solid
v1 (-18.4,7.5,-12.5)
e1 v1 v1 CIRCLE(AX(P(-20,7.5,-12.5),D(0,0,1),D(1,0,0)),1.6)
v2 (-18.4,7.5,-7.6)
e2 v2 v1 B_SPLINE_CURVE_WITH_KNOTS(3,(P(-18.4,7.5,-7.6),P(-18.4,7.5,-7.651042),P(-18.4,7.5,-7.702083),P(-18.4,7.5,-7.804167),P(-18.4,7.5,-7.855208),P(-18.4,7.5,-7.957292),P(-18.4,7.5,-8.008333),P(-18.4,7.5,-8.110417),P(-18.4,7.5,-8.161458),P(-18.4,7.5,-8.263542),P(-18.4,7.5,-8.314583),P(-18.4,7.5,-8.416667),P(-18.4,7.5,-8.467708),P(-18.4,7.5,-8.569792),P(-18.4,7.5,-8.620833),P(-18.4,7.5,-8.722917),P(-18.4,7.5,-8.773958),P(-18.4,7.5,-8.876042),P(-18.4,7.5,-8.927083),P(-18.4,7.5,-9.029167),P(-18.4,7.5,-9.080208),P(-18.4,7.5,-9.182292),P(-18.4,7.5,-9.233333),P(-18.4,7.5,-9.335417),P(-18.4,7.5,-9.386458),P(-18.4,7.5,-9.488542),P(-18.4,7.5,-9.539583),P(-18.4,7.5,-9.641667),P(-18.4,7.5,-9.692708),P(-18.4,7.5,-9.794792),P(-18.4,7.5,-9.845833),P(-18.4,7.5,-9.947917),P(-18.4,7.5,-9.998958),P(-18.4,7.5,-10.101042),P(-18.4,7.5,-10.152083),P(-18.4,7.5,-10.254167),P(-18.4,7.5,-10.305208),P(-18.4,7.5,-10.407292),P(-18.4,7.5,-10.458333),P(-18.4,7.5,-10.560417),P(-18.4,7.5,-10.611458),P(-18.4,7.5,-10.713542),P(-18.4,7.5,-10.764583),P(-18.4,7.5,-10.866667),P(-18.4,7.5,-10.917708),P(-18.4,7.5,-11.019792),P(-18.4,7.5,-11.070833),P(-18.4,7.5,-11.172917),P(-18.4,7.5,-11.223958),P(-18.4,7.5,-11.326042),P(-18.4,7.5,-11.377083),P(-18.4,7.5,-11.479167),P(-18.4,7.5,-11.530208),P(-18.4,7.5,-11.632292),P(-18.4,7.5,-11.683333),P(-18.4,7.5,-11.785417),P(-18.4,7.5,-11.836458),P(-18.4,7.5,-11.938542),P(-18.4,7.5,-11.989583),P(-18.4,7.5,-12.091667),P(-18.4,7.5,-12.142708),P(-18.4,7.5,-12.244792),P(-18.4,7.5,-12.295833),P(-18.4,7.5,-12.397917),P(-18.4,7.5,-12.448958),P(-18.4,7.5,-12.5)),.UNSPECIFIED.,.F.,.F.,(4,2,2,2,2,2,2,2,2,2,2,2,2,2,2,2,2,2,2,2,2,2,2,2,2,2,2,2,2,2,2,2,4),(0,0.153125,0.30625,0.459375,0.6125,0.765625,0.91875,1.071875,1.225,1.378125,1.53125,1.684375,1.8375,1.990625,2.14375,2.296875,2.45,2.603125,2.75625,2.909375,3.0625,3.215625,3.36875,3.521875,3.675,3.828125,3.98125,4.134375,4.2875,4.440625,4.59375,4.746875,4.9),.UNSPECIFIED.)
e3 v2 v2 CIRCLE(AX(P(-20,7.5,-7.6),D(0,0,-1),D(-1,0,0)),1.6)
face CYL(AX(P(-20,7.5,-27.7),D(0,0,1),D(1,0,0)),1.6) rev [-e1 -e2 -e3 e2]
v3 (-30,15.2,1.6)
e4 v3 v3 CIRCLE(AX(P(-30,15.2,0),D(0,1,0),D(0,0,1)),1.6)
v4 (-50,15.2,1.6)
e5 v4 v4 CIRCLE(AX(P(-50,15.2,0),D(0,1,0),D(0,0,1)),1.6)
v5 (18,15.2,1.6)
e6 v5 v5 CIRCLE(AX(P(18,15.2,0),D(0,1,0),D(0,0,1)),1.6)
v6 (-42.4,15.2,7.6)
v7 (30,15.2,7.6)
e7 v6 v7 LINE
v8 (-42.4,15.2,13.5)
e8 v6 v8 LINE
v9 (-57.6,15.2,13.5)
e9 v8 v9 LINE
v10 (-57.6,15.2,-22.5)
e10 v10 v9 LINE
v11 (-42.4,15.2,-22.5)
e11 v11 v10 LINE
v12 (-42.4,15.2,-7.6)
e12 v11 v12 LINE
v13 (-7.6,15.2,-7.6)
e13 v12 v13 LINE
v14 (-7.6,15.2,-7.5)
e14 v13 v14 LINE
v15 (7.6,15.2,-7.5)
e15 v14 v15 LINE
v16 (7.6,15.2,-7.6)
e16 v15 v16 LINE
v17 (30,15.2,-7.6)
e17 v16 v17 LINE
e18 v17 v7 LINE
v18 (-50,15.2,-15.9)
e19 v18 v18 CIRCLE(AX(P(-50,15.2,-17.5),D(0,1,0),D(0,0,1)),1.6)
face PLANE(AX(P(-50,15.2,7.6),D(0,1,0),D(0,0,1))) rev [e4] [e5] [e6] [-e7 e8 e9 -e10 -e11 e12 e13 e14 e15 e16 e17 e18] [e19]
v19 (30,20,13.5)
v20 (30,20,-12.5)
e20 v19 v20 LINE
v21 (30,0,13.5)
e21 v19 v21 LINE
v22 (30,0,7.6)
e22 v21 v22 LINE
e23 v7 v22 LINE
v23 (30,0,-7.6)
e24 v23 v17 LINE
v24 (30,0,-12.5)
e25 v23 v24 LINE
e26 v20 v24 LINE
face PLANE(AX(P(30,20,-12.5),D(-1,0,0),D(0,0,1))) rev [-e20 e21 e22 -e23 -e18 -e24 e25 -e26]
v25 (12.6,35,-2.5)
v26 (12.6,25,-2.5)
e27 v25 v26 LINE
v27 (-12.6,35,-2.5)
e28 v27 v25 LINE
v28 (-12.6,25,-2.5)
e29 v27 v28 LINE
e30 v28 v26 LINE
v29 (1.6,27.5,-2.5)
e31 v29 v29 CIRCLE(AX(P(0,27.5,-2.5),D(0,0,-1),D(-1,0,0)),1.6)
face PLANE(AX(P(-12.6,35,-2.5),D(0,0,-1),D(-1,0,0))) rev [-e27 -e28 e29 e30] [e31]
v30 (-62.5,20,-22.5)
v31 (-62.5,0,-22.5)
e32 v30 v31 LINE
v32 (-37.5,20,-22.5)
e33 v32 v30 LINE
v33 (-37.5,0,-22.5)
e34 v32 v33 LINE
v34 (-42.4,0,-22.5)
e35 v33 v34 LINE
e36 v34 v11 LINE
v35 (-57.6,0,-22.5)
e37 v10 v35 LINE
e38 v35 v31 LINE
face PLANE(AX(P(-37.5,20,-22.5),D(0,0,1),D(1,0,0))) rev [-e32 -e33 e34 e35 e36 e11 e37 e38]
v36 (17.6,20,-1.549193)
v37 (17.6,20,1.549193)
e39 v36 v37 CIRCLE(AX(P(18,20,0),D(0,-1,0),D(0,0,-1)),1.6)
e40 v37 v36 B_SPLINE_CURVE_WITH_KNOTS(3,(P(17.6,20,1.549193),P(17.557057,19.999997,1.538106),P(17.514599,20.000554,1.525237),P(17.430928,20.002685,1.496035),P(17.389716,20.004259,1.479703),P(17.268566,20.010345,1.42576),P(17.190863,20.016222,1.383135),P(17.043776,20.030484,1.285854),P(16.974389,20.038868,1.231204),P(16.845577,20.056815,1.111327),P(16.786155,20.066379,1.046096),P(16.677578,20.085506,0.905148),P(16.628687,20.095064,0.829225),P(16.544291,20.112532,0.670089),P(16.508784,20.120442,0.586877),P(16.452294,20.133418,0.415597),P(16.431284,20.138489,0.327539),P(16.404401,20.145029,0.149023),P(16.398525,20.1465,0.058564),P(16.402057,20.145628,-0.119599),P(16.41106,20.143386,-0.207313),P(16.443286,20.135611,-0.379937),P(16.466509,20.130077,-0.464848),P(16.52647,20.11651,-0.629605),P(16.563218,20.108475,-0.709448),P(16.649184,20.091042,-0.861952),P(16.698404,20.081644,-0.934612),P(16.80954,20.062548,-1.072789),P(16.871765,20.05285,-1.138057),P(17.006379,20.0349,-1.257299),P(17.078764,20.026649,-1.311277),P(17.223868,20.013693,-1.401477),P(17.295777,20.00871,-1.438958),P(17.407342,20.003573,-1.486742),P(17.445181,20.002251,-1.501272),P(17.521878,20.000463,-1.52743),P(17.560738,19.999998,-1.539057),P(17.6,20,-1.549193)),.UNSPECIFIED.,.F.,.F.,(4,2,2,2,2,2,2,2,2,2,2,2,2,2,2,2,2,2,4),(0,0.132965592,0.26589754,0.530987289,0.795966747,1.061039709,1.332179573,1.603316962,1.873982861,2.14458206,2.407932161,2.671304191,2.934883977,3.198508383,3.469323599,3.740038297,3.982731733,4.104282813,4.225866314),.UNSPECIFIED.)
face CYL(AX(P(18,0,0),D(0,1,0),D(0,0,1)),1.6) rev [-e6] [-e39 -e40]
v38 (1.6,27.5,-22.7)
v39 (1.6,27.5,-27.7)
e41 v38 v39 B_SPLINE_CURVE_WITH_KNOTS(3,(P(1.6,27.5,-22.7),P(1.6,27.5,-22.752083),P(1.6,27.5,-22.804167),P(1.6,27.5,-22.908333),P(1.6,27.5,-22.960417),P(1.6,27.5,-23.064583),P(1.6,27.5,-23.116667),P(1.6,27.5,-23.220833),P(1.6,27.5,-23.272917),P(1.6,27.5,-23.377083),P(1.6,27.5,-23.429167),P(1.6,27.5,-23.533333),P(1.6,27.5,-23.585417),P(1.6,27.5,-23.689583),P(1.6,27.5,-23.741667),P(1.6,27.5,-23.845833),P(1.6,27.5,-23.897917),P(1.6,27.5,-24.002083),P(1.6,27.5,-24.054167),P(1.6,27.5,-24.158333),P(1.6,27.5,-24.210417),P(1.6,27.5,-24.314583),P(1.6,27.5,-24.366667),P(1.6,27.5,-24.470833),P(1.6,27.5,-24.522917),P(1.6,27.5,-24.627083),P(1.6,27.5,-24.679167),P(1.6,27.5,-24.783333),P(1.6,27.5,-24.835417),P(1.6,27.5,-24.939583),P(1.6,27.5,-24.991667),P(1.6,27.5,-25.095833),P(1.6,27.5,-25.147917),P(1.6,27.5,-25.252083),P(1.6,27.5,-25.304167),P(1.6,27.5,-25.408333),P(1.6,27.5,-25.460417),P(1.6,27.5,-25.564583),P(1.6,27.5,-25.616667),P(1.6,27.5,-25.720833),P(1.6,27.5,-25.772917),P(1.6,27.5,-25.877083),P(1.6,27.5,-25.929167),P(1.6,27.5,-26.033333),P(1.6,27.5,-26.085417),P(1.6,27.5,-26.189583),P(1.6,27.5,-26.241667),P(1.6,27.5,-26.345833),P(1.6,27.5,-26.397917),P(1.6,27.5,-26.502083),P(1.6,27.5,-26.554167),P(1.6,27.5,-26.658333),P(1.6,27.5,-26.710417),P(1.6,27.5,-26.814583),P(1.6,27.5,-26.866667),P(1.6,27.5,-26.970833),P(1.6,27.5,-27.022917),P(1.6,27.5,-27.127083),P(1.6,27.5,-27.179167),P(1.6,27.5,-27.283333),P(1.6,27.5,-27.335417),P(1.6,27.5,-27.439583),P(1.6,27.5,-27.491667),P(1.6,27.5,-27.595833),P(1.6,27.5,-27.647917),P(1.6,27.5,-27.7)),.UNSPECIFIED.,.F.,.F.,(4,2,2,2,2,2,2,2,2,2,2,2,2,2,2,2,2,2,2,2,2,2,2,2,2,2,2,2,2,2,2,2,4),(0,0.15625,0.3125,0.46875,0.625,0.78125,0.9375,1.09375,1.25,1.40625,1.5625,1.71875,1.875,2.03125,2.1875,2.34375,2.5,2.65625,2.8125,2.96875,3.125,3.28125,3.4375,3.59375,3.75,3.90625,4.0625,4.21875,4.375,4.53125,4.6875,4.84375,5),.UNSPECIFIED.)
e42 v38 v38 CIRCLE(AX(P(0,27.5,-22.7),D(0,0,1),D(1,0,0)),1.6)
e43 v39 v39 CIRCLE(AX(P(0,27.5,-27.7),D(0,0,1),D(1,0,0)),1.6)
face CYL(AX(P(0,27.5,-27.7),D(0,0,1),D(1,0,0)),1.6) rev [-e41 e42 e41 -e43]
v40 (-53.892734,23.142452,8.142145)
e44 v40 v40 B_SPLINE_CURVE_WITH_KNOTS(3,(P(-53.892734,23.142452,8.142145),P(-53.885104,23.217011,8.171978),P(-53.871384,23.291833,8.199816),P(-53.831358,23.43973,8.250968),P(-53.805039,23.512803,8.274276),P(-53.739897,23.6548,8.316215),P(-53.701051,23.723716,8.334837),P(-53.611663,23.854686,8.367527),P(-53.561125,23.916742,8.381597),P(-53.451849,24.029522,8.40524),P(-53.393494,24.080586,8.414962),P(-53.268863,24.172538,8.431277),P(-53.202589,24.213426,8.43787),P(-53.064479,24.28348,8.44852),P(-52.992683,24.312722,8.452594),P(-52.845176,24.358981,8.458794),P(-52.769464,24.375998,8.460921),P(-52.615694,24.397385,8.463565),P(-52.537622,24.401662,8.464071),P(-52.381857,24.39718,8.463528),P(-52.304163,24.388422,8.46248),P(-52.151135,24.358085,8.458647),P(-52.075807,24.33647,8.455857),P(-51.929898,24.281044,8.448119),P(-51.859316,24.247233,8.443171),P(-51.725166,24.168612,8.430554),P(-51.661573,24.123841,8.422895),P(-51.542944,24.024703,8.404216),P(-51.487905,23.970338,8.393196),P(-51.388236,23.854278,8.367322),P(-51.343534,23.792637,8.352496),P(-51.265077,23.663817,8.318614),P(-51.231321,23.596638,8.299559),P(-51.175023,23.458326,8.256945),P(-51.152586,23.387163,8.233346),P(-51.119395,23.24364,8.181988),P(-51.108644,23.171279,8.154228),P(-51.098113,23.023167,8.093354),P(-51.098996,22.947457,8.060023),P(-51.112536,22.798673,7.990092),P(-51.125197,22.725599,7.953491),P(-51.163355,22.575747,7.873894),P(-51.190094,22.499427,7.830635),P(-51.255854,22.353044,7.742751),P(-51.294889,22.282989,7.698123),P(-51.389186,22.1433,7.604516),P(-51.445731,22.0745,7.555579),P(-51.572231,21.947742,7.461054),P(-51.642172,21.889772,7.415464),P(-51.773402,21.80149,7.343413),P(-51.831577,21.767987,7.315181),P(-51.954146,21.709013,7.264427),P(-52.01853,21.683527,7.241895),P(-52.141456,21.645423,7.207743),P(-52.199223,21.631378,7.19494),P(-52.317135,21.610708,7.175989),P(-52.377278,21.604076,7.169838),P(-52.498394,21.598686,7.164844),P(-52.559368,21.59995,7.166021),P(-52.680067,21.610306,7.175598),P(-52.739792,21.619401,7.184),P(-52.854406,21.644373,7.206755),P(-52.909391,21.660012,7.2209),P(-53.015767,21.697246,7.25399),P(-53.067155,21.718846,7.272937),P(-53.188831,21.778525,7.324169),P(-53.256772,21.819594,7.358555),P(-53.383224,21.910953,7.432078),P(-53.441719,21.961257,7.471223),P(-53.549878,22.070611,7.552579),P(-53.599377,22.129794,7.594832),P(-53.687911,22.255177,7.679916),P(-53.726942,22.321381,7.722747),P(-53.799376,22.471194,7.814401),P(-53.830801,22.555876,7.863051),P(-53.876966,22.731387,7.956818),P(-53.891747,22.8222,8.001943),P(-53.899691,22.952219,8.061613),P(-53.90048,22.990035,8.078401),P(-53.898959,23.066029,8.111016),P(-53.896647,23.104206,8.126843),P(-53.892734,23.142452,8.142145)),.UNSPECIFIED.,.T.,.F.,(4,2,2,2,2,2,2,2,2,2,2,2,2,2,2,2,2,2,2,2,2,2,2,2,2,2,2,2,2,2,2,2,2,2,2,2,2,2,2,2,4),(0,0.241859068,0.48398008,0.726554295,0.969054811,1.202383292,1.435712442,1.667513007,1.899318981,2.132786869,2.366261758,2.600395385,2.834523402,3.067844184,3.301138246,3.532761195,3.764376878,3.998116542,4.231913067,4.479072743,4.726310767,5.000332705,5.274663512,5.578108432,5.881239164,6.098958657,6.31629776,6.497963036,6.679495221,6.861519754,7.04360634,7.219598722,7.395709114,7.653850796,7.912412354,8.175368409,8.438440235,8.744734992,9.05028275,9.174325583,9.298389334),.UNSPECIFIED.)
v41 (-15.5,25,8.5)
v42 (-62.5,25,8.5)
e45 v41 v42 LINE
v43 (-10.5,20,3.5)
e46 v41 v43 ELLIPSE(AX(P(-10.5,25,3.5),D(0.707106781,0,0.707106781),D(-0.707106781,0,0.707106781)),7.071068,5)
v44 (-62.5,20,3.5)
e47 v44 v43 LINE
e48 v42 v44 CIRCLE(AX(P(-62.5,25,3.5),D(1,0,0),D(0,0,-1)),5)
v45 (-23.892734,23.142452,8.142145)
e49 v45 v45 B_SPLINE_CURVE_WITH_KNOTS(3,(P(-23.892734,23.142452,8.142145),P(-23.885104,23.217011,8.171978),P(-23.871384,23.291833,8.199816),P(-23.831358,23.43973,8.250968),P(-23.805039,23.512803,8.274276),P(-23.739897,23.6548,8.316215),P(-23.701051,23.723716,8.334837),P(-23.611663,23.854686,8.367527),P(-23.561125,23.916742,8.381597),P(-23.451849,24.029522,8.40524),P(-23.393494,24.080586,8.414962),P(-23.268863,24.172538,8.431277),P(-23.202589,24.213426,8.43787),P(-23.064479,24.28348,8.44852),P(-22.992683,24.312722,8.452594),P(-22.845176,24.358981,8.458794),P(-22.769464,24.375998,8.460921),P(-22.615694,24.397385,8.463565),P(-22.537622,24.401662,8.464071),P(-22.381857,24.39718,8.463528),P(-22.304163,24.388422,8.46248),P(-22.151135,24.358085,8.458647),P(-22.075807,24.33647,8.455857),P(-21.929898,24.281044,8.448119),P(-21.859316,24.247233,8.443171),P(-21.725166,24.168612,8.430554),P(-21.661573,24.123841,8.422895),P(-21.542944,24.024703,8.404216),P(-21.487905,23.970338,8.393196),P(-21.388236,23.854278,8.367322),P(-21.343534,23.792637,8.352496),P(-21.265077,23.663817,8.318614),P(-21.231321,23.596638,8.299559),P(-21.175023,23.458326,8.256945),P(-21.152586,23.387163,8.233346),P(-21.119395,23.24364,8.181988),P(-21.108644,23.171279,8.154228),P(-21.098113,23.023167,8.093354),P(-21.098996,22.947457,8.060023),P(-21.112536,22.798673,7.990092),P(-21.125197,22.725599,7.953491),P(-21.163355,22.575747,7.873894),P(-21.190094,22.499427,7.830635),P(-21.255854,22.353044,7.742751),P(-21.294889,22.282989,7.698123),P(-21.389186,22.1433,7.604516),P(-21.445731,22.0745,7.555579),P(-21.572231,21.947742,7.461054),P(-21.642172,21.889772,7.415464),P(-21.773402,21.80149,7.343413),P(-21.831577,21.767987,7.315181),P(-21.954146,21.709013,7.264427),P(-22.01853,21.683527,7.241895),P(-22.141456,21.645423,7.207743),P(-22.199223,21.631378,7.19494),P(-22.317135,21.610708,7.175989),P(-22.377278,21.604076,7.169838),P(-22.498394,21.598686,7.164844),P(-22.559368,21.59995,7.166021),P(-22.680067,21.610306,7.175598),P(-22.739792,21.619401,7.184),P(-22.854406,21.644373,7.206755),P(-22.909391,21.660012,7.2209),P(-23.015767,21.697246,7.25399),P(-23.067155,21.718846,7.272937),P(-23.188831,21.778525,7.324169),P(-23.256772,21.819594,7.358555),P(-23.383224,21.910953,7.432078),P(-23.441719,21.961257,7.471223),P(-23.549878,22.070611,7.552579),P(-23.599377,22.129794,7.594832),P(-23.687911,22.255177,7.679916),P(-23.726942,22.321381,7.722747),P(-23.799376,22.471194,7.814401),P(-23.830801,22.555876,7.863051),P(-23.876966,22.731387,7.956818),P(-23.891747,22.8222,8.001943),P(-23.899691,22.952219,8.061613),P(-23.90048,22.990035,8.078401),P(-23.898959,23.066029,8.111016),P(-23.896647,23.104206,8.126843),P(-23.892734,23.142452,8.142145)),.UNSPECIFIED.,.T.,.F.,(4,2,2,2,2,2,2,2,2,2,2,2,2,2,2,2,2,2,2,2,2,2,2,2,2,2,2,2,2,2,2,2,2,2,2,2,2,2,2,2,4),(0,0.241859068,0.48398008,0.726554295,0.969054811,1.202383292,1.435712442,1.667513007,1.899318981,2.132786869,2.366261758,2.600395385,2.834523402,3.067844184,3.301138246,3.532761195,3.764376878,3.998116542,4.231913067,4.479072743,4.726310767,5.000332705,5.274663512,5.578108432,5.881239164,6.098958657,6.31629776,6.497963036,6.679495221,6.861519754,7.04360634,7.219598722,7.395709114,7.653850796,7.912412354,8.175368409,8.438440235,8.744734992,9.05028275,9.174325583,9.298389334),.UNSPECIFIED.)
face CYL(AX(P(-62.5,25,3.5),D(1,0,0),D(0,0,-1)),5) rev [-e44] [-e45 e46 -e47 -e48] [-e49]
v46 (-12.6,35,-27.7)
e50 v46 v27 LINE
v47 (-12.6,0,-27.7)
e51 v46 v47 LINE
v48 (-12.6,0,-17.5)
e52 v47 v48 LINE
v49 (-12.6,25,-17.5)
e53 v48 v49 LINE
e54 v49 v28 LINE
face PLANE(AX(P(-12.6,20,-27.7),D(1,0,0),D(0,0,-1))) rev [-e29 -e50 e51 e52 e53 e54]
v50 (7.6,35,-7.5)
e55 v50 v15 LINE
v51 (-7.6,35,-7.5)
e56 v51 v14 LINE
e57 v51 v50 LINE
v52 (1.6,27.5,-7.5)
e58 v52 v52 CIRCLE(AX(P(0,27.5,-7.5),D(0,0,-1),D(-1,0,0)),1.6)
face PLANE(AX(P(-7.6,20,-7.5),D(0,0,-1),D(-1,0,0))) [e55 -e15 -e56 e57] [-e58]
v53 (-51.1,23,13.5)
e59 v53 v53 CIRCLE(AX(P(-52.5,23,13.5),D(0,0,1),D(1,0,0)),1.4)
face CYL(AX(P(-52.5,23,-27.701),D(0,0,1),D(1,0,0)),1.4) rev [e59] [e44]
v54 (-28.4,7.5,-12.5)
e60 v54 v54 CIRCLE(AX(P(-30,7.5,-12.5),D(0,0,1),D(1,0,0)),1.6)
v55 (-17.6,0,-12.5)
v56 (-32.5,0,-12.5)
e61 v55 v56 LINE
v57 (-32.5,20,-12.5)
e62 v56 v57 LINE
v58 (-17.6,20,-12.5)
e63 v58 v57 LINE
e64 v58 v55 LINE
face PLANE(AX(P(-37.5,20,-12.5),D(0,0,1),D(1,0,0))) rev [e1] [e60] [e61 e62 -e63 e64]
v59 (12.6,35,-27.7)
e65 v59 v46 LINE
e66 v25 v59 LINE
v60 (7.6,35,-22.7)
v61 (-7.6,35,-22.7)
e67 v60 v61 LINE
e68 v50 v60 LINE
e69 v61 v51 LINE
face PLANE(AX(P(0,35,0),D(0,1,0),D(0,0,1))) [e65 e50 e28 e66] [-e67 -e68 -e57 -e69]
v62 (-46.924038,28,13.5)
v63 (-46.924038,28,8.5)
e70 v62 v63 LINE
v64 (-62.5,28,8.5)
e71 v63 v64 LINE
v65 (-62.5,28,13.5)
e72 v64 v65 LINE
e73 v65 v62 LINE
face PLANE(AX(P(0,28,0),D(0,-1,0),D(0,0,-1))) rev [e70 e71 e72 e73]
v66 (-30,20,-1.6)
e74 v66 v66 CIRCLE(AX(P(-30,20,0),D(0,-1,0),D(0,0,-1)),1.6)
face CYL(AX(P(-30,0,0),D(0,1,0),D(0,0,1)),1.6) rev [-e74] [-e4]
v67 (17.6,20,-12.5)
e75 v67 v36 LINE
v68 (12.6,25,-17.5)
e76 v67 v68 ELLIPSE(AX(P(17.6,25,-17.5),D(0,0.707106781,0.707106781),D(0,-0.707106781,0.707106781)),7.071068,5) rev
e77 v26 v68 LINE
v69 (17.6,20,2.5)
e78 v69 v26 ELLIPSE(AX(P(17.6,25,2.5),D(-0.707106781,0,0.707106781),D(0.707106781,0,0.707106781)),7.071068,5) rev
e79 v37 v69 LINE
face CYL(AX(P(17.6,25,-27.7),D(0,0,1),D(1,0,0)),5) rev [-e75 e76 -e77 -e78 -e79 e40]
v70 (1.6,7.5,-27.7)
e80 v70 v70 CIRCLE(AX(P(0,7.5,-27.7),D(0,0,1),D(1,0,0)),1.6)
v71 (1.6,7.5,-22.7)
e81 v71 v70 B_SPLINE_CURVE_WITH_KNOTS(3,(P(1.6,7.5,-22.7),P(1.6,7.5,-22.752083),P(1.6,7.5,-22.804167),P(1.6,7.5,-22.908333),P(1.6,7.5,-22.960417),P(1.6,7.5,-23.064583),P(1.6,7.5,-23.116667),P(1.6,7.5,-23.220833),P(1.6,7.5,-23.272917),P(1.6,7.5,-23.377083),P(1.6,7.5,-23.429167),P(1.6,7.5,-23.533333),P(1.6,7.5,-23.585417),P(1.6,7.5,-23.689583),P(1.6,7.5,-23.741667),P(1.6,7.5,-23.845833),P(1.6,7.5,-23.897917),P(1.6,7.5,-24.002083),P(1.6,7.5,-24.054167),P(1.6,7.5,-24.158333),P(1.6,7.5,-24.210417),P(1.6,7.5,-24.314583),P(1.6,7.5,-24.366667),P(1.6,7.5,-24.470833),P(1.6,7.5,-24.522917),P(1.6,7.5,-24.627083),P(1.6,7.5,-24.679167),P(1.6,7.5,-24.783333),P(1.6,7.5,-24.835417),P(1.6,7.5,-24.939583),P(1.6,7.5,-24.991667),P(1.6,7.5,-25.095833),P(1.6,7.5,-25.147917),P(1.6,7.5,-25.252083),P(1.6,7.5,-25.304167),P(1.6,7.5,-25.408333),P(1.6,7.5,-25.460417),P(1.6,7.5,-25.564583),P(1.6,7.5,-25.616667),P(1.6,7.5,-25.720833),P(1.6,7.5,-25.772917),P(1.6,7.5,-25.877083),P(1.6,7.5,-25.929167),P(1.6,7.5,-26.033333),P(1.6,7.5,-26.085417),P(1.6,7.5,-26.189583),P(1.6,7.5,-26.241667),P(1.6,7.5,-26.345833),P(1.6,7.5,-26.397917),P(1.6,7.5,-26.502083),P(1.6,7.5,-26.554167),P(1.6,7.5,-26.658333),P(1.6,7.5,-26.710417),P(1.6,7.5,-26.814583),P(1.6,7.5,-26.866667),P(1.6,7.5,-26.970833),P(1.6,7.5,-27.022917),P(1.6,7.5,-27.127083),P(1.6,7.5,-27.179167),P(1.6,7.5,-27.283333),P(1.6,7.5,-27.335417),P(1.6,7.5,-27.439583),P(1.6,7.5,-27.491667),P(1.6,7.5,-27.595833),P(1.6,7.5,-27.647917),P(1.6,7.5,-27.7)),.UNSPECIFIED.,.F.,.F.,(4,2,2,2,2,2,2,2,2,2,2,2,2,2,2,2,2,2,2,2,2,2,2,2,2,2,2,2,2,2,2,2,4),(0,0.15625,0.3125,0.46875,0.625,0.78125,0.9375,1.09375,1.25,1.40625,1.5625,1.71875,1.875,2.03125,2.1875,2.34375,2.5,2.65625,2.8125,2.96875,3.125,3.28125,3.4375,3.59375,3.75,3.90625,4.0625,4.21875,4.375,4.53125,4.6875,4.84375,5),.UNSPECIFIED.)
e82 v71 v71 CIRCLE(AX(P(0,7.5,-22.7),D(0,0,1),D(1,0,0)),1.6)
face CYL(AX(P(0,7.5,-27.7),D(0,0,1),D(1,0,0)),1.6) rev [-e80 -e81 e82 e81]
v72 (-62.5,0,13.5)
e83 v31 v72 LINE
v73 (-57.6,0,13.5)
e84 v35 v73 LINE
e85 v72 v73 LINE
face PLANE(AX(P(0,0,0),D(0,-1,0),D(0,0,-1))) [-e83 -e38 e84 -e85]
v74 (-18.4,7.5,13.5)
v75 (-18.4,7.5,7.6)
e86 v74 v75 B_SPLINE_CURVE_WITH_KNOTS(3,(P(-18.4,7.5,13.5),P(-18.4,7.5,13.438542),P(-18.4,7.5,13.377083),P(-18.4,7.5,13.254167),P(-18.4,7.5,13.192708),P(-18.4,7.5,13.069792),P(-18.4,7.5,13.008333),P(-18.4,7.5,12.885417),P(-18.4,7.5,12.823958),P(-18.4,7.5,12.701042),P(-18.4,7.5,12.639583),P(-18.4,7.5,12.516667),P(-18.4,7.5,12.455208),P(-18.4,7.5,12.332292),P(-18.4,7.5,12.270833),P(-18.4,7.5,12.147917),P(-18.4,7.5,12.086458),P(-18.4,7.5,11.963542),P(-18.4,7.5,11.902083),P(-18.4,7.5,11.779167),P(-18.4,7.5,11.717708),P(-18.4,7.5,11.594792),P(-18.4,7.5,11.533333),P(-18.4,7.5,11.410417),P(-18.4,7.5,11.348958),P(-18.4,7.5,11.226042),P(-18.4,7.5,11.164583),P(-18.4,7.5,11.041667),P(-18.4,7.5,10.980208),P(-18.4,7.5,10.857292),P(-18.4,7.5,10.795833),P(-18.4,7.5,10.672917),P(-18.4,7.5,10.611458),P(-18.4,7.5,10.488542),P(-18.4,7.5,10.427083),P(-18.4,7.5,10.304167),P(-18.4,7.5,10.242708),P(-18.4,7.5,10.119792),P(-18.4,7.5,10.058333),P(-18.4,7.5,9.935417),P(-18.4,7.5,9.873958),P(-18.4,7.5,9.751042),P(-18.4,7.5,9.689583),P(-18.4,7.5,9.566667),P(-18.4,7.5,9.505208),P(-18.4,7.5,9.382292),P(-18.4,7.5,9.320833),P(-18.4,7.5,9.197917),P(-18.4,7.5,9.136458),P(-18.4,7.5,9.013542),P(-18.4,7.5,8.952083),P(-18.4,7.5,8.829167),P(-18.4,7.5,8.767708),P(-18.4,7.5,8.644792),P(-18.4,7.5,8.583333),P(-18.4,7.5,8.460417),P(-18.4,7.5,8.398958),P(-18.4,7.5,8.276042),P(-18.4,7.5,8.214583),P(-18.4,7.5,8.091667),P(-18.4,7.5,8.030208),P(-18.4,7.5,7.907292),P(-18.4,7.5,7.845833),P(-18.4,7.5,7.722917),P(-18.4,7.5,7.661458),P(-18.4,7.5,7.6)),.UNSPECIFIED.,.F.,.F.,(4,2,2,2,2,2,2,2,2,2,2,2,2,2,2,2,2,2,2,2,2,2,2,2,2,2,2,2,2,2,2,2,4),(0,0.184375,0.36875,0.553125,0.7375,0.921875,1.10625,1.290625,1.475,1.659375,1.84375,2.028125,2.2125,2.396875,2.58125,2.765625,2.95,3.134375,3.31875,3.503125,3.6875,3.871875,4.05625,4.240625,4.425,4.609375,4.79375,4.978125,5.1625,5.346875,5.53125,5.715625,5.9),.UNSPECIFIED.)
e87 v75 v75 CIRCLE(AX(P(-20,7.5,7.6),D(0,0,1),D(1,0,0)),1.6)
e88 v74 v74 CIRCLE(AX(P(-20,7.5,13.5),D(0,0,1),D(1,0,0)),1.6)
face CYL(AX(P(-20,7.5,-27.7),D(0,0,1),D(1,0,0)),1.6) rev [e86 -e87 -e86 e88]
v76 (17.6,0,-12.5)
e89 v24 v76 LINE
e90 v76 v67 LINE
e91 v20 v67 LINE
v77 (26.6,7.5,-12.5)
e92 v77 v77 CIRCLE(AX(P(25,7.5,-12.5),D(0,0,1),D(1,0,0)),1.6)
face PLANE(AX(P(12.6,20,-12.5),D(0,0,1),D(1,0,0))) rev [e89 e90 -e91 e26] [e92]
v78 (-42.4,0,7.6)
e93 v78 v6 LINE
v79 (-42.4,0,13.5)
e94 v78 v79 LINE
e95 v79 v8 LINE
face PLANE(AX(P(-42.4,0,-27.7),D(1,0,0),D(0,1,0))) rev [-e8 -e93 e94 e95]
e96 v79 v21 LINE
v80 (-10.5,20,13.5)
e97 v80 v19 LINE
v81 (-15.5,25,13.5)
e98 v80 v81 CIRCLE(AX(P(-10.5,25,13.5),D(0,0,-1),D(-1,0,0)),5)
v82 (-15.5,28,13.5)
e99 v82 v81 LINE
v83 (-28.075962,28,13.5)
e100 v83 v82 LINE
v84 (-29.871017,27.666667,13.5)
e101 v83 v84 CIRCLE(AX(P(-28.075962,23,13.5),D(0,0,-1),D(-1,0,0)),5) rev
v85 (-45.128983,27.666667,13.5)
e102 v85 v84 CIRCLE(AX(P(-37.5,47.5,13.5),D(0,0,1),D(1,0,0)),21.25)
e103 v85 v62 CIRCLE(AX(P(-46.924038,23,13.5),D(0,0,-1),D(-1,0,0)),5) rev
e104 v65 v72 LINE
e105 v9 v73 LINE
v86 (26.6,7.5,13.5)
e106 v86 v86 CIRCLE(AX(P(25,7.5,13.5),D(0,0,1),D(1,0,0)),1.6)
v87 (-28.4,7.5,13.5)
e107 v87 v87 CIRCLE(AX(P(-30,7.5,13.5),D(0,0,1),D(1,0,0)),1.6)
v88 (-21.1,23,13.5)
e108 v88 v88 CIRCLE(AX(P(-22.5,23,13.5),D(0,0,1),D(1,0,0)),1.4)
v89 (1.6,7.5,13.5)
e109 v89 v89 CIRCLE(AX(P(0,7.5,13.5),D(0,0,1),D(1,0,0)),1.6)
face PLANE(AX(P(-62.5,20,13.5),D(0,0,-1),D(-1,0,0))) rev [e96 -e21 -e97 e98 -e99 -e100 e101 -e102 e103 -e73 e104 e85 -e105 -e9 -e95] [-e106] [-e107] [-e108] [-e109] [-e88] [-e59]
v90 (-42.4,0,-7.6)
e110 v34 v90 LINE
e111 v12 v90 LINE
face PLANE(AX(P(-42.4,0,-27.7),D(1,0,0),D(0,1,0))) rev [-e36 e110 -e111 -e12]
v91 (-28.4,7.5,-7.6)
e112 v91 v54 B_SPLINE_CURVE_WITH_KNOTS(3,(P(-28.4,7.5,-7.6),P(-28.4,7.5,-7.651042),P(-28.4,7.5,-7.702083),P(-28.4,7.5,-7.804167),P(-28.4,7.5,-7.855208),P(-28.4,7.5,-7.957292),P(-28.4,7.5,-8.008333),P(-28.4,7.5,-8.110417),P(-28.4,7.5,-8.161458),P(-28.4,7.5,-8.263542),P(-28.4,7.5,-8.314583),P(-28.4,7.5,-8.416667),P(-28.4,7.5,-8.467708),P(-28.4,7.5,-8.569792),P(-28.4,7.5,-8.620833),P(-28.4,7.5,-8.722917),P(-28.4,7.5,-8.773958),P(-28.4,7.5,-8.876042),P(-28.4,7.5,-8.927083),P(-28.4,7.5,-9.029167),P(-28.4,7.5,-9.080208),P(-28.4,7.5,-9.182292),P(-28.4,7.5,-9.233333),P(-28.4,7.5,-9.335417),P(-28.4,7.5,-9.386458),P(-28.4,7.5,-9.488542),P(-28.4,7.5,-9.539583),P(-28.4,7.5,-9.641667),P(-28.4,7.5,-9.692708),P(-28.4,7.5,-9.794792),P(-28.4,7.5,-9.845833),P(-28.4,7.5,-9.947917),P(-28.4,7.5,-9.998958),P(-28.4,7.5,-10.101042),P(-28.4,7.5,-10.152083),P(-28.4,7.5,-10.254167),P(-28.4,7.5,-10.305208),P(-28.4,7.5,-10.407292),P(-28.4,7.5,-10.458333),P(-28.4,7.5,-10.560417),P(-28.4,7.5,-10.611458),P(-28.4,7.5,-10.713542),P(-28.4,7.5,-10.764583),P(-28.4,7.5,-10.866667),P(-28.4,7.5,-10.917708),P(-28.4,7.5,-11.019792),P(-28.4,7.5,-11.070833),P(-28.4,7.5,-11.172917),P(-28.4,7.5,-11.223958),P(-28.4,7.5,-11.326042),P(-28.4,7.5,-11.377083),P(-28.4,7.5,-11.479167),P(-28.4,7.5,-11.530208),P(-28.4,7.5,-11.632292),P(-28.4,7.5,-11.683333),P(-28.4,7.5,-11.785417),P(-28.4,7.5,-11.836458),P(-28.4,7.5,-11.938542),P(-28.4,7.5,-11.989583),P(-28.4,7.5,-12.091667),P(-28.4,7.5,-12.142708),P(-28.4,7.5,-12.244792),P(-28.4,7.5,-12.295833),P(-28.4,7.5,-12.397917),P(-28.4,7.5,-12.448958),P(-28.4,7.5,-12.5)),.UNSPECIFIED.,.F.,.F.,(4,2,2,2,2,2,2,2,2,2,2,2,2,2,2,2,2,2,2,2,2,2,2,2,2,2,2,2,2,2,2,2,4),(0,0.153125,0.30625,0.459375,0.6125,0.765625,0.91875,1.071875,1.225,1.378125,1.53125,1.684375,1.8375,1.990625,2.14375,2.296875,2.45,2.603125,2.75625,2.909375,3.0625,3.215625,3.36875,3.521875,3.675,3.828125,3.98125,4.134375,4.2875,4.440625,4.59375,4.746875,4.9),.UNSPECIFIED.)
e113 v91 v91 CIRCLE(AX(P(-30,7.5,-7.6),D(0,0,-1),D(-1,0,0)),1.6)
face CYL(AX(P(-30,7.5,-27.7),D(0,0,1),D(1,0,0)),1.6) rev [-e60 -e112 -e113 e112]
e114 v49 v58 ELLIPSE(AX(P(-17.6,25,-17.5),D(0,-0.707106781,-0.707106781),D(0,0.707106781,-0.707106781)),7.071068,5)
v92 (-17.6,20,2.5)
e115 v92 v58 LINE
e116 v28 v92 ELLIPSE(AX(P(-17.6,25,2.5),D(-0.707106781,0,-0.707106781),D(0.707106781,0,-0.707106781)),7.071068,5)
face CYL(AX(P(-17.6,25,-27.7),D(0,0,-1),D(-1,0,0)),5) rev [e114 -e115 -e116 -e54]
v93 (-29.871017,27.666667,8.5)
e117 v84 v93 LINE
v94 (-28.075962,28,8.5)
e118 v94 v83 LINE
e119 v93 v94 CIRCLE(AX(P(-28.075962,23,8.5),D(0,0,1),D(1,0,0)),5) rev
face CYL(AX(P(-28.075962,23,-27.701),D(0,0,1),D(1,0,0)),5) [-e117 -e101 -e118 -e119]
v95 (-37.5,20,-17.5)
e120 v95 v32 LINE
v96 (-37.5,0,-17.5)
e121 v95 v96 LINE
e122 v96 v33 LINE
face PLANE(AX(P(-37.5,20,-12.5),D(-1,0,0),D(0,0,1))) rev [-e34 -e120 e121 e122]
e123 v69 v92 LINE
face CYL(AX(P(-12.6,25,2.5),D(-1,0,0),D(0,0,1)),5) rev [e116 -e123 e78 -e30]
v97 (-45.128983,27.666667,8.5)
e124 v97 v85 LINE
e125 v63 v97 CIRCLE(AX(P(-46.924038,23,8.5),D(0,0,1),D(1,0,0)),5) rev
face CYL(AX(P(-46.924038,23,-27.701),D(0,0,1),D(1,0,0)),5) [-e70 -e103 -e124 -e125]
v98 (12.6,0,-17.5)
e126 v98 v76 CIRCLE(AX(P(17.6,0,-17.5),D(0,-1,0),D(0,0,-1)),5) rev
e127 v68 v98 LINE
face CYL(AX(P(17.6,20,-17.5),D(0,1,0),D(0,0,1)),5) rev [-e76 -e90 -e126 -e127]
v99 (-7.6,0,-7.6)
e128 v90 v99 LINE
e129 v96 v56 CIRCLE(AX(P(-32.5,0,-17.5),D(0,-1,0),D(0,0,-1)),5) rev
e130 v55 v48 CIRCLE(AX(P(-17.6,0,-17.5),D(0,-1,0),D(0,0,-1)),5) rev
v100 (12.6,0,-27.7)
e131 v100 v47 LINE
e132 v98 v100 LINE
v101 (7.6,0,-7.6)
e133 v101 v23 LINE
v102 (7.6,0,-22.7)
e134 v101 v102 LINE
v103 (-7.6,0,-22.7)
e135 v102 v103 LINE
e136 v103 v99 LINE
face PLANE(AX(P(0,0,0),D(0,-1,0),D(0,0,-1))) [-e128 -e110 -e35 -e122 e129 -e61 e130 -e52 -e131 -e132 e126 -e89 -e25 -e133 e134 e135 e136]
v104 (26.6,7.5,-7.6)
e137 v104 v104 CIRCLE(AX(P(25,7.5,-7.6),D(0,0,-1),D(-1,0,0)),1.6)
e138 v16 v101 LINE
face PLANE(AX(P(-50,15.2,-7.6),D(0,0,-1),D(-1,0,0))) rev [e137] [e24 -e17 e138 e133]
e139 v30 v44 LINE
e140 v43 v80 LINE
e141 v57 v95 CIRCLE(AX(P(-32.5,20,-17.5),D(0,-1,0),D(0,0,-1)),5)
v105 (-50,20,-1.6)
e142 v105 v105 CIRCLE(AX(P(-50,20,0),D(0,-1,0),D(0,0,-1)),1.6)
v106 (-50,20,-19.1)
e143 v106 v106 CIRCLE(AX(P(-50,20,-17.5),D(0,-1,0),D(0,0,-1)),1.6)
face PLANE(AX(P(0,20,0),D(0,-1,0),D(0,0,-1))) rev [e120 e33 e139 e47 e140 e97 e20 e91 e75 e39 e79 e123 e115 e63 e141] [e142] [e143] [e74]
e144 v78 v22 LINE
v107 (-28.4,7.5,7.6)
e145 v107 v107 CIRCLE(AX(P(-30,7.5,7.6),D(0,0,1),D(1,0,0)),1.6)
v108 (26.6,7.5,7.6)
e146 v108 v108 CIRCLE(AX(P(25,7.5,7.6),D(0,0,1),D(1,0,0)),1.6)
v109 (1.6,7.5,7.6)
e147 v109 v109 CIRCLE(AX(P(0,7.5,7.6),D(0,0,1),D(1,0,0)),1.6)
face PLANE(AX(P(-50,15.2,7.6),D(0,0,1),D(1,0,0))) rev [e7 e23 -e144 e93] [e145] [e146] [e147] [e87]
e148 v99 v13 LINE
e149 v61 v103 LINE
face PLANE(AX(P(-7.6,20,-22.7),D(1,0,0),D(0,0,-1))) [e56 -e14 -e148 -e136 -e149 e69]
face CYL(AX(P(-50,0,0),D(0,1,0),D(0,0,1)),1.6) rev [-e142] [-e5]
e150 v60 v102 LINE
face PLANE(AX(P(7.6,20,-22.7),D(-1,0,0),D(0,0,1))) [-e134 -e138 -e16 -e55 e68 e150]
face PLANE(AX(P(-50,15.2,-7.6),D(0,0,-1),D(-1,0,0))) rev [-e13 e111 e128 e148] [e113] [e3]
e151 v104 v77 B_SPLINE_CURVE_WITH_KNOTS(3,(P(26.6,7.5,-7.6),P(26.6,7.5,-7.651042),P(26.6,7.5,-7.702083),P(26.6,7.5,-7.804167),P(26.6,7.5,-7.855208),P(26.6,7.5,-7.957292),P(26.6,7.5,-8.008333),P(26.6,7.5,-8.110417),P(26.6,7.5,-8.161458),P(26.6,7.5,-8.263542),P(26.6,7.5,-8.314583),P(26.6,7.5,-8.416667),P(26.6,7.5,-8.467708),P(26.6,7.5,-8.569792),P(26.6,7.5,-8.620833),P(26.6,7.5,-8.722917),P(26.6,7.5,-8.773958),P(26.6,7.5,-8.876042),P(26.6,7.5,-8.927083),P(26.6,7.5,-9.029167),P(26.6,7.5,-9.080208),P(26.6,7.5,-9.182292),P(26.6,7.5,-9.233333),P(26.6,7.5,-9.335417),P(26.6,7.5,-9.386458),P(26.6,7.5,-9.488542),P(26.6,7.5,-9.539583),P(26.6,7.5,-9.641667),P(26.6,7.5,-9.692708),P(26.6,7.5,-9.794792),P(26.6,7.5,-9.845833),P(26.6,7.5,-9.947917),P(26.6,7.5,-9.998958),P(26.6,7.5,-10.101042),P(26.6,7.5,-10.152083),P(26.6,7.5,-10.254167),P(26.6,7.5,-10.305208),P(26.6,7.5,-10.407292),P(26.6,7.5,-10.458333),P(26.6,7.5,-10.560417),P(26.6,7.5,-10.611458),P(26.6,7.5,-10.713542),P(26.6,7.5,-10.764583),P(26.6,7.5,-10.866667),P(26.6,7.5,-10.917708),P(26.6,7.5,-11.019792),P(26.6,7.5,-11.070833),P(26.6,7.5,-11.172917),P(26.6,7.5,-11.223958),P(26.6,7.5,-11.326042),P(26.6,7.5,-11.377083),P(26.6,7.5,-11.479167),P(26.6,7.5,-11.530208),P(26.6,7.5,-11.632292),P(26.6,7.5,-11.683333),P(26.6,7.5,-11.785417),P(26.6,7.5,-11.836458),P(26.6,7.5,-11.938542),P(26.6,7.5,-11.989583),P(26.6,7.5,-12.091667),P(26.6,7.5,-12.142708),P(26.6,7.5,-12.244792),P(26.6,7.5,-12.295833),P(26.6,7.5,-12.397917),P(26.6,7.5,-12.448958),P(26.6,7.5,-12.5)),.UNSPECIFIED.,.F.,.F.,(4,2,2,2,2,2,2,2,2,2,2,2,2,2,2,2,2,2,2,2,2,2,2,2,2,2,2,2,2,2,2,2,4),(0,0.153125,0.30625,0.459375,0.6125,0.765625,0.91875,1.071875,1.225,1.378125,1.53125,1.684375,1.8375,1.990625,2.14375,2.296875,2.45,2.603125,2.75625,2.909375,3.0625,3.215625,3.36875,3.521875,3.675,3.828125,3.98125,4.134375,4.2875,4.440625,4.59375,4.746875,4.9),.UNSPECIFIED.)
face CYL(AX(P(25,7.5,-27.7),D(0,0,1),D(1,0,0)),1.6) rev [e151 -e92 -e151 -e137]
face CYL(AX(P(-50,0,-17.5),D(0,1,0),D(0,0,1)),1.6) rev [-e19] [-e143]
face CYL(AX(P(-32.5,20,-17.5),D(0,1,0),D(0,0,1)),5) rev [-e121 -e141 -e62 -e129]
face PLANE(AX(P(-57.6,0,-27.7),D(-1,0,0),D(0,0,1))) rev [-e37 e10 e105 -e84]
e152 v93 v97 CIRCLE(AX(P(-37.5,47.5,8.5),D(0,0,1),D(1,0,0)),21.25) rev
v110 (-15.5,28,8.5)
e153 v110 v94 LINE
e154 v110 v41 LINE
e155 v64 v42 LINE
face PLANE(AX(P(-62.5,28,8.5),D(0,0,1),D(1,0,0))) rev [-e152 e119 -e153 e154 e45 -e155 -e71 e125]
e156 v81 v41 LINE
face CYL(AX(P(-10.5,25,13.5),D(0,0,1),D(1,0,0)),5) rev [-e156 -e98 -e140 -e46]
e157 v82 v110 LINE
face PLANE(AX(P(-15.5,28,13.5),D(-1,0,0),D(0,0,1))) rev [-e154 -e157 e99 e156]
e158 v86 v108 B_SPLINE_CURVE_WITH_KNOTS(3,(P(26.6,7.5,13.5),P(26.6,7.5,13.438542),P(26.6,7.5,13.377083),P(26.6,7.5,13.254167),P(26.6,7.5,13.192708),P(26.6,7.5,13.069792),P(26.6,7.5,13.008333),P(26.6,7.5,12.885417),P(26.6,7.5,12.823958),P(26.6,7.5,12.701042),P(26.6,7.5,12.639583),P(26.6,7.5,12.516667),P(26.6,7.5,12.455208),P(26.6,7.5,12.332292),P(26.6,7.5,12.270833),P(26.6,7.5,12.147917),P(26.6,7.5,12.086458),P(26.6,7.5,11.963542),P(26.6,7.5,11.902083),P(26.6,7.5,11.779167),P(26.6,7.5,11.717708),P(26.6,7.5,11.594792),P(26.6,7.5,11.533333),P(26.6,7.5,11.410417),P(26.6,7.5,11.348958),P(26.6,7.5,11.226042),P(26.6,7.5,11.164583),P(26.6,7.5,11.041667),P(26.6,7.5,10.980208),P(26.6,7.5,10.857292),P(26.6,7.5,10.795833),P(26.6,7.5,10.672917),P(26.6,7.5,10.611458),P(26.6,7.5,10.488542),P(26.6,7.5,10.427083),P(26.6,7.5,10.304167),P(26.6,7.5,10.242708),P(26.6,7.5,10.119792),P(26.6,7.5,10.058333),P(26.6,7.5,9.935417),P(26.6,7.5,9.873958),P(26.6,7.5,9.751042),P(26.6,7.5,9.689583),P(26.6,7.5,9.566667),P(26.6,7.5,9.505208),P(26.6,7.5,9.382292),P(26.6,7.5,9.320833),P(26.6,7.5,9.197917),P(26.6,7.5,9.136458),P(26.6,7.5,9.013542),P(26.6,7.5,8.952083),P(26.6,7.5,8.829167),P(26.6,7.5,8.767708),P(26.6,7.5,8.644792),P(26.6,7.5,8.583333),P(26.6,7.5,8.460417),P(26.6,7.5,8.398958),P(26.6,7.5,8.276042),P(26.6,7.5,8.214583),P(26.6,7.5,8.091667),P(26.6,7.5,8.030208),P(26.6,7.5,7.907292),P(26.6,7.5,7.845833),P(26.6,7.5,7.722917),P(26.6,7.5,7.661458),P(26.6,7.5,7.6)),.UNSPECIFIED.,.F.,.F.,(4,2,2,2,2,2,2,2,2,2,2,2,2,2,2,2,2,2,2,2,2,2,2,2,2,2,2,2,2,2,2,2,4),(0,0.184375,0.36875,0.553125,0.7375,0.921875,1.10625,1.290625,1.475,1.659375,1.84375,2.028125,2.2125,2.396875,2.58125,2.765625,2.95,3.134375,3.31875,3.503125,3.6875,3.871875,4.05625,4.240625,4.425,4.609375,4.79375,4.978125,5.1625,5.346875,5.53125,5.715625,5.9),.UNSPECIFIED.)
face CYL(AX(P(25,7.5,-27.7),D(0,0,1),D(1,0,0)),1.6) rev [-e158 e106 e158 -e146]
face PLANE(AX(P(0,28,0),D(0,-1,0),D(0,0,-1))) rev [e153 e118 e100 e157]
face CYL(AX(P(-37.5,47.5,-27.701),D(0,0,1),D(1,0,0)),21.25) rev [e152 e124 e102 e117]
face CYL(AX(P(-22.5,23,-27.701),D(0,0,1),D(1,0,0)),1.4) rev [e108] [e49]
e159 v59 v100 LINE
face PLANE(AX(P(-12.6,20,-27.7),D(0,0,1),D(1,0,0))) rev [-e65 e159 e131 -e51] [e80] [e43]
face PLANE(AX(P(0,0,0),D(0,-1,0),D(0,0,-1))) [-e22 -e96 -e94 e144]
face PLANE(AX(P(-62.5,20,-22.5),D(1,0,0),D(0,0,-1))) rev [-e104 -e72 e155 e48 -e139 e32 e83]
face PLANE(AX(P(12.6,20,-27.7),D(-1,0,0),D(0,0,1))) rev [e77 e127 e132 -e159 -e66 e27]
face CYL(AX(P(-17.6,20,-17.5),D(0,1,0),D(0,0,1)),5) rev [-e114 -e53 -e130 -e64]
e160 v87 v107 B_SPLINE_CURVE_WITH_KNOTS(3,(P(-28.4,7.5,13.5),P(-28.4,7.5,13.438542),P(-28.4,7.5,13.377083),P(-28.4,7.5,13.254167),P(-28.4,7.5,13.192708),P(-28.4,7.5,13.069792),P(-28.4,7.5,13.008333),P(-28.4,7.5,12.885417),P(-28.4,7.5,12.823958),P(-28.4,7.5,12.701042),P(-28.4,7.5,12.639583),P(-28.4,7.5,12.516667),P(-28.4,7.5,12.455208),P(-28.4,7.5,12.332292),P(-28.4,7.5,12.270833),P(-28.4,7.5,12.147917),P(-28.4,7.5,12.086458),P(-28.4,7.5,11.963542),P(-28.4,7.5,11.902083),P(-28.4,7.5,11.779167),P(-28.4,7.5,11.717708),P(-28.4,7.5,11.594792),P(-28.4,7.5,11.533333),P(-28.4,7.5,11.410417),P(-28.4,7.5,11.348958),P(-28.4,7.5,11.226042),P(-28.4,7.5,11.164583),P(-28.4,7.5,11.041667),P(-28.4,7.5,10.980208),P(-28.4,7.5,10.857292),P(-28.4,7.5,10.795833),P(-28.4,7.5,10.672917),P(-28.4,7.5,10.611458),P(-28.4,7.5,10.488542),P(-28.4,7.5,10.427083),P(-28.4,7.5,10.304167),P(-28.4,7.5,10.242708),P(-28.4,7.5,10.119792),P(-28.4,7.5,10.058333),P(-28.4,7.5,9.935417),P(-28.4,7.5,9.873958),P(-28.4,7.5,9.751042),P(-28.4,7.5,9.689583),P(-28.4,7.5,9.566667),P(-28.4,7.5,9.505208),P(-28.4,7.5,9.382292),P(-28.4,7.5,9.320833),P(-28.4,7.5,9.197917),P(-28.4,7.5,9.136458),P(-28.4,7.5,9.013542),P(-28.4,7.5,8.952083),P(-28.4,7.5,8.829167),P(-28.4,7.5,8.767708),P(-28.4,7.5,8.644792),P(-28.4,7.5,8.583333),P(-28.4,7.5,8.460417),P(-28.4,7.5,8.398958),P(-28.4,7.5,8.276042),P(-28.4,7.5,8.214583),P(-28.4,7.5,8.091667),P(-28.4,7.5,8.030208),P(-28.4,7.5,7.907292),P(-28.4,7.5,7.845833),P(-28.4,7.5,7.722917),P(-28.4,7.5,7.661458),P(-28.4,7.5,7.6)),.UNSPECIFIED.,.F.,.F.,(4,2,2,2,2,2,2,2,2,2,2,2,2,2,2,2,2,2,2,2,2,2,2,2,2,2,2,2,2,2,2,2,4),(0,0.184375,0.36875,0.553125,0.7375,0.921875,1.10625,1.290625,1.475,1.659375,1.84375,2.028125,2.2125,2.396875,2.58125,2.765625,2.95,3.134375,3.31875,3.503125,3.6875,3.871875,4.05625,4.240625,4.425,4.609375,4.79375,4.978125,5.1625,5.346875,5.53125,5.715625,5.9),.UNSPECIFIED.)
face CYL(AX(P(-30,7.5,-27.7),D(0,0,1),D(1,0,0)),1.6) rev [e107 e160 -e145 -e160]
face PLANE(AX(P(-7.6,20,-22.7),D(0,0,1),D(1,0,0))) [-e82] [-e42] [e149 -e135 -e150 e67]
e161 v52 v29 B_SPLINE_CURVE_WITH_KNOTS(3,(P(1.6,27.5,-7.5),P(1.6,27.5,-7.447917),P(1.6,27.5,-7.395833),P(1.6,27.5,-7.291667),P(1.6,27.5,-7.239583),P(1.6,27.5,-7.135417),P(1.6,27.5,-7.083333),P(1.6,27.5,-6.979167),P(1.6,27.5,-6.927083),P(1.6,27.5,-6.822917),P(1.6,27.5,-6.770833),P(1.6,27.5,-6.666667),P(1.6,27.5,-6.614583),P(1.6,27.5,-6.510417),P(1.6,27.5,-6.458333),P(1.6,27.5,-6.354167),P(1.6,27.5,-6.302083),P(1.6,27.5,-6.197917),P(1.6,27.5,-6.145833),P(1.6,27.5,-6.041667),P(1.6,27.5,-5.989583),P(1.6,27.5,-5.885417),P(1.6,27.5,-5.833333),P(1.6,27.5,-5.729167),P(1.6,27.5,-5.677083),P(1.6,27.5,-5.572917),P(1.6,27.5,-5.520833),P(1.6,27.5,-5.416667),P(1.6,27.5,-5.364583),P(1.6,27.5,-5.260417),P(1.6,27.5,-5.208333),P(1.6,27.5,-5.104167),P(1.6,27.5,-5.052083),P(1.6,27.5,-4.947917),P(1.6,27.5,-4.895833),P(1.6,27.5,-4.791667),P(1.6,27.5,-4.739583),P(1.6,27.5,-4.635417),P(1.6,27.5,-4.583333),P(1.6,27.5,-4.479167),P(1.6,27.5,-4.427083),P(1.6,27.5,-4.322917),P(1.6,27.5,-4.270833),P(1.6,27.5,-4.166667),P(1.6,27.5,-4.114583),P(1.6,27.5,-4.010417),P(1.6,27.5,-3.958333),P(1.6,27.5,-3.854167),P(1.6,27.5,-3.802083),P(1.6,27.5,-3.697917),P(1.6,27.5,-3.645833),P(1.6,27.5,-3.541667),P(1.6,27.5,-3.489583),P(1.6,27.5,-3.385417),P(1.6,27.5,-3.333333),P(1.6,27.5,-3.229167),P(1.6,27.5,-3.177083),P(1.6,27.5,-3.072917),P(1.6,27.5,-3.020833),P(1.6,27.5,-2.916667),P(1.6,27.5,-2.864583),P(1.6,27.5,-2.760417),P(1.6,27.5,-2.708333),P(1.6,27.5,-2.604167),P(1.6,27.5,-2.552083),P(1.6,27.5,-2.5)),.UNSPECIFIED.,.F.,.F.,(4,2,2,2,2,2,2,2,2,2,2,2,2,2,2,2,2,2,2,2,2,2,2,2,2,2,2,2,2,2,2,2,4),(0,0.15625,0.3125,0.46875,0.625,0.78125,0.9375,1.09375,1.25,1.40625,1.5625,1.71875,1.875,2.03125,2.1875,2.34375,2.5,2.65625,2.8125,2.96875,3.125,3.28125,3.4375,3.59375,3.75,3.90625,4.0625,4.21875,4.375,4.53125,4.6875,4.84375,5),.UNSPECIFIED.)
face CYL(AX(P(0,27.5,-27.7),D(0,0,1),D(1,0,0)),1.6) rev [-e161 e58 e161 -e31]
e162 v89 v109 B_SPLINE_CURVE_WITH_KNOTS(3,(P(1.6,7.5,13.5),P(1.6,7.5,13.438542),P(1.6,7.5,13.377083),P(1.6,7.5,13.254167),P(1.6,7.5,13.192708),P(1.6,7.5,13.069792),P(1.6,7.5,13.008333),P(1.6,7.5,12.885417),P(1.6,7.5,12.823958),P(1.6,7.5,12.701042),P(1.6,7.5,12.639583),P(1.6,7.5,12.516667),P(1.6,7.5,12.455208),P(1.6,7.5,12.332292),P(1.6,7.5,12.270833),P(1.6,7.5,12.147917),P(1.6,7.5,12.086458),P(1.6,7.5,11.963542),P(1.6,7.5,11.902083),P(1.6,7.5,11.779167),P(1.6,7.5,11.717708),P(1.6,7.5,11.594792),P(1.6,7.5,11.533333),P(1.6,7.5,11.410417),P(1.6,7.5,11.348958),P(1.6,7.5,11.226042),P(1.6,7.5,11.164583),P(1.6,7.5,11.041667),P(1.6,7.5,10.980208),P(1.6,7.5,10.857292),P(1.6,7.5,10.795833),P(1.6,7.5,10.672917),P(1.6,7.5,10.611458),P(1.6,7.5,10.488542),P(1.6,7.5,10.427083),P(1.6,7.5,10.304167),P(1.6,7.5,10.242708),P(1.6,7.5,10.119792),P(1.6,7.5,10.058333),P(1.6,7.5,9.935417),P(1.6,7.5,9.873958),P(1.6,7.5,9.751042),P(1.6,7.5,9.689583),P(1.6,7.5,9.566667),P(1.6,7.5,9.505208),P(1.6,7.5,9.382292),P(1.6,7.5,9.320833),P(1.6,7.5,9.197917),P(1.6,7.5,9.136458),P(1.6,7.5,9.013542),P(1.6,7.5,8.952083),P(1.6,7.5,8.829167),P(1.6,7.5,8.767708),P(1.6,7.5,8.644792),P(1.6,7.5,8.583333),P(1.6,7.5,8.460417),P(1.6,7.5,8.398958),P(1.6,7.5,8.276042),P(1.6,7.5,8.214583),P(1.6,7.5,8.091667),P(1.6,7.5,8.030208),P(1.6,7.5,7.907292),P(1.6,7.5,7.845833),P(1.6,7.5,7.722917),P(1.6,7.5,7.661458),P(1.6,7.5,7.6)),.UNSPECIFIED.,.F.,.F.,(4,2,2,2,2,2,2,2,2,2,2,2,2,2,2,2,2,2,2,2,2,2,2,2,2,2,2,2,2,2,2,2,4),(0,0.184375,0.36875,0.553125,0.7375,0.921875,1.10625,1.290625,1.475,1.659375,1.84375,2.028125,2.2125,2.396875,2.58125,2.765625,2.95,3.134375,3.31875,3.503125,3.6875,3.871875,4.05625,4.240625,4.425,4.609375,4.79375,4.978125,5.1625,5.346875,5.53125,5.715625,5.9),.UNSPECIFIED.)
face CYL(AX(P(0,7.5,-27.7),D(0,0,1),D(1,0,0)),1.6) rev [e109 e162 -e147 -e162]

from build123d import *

# Parameters (mm, degrees)
SKETCH_1_W               = 15.2
SKETCH_1_H               = 15.2
EXTRUDE_1_DEPTH          = 20
SKETCH_2_W               = 25.2
SKETCH_2_H               = 25.2
SKETCH_2_W_2             = 15.2
SKETCH_2_H_2             = 15.2
EXTRUDE_2_DEPTH          = 15
SKETCH_3_W               = 15.2
SKETCH_3_H               = 15.2
CUT_EXTRUDE_1_DEPTH      = 80
SKETCH_4_R               = 1.6
CUT_EXTRUDE_2_DEPTH      = 83.635888087
FILLET_1_R               = 5
SKETCH_5_W               = 15.2
SKETCH_5_H               = 15.2
CUT_EXTRUDE_3_DEPTH      = 83.635888087
CUT_EXTRUDE_5_DEPTH      = 72.228786316
CUT_EXTRUDE_5_DEPTH_BACK = 72.228786316
SKETCH_7_R               = 1.6
SKETCH_8_W               = 47
SKETCH_8_H               = 5
EXTRUDE_3_DEPTH          = 8
CUT_EXTRUDE_6_REACH      = 84.636
SKETCH_9_R               = 21.25
SKETCH_9_R_2             = 1.4
FILLET_2_R               = 5


with BuildPart() as part:
    # 草图1 → 凸台-拉伸1 (new body)
    with BuildSketch(Plane(origin=(0, 0, 0), x_dir=(1, 0, 0), z_dir=(0, 1, 0))):
        Polygon((-37.5, 12.5), (-12.6, 12.5), (-12.6, 27.7), (12.6, 27.7), (12.6, 12.5), (30, 12.5), (30, -13.5), (-62.5, -13.5), (-62.5, 22.5), (-37.5, 22.5), align=None)
        with Locations((0, 15.1)):
            Rectangle(SKETCH_1_W, SKETCH_1_H, mode=Mode.SUBTRACT)
    extrude(amount=EXTRUDE_1_DEPTH)

    # 草图2 → 凸台-拉伸2 (add)
    with BuildSketch(Plane(origin=(0, 20, 0), x_dir=(1, 0, 0), z_dir=(0, 1, 0))):
        with Locations((0, 15.1)):
            Rectangle(SKETCH_2_W, SKETCH_2_H)
        with Locations((0, 15.1)):
            Rectangle(SKETCH_2_W_2, SKETCH_2_H_2, mode=Mode.SUBTRACT)
    extrude(amount=EXTRUDE_2_DEPTH)

    # 草图3 → 切除-拉伸1 (cut)
    with BuildSketch(Plane(origin=(30, 0, 0), x_dir=(0, 0, -1), z_dir=(1, 0, 0))):
        with Locations((0, 7.6)):
            Rectangle(SKETCH_3_W, SKETCH_3_H)
    extrude(amount=-CUT_EXTRUDE_1_DEPTH, mode=Mode.SUBTRACT)

    # 草图4 → 切除-拉伸2 (cut, through all)
    with BuildSketch(Plane.XY.offset(13.5)):
        with Locations((0, 7.5)):
            Circle(SKETCH_4_R)
        with Locations((25, 7.5)):
            Circle(SKETCH_4_R)
        with Locations((-20, 7.5)):
            Circle(SKETCH_4_R)
        with Locations((0, 27.5)):
            Circle(SKETCH_4_R)
        with Locations((-30, 7.5)):
            Circle(SKETCH_4_R)
    extrude(amount=-CUT_EXTRUDE_2_DEPTH, mode=Mode.SUBTRACT)

    # 圆角1
    fillet_1_edges = [part.edges().sort_by_distance(p)[0] for p in [
        (-37.5, 10, -12.5),
        (-12.6, 10, -12.5),
        (12.6, 10, -12.5),
        (-12.6, 20, -7.5),
        (0, 20, -2.5),
        (12.6, 20, -7.5),
    ]]
    fillet(fillet_1_edges, radius=FILLET_1_R)

    # 草图5 → 切除-拉伸3 (cut, through all)
    with BuildSketch(Plane.XY.offset(13.5)):
        with Locations((-50, 7.6)):
            Rectangle(SKETCH_5_W, SKETCH_5_H)
    extrude(amount=-CUT_EXTRUDE_3_DEPTH, mode=Mode.SUBTRACT)

    # 草图7 → 切除-拉伸5 (cut, two sides: drawn at the far end of the back side and taken through both)
    with BuildSketch(Plane(origin=(0, 20, 0), x_dir=(1, 0, 0), z_dir=(0, 1, 0)).offset(-CUT_EXTRUDE_5_DEPTH_BACK)):
        with Locations(Location((-50, 0, 0), (0, 0, 270))):
            Circle(SKETCH_7_R)
        with Locations(Location((-30, 0, 0), (0, 0, 270))):
            Circle(SKETCH_7_R)
        with Locations(Location((18, 0, 0), (0, 0, 270))):
            Circle(SKETCH_7_R)
        with Locations(Location((-50, 17.5, 0), (0, 0, 270))):
            Circle(SKETCH_7_R)
    extrude(amount=CUT_EXTRUDE_5_DEPTH + CUT_EXTRUDE_5_DEPTH_BACK, mode=Mode.SUBTRACT)

    # 草图8 → 凸台-拉伸3 (add)
    with BuildSketch(Plane(origin=(0, 20, 0), x_dir=(1, 0, 0), z_dir=(0, 1, 0))):
        with Locations((-39, -11)):
            Rectangle(SKETCH_8_W, SKETCH_8_H)
    extrude(amount=EXTRUDE_3_DEPTH)

    # 草图9 → 切除-拉伸6 (cut, up to next)
    with BuildSketch(Plane.XY.offset(13.5), mode=Mode.PRIVATE) as cut_extrude_6_sk1:
        with Locations((-37.5, 47.5)):
            Circle(SKETCH_9_R)
    cut_extrude_6_tool1 = extrude(cut_extrude_6_sk1.sketch, amount=-CUT_EXTRUDE_6_REACH, mode=Mode.PRIVATE) & part.part
    # 草图9 → 切除-拉伸6 (cut, up to next)
    with BuildSketch(Plane.XY.offset(13.5), mode=Mode.PRIVATE) as cut_extrude_6_sk2:
        with Locations((-52.5, 23)):
            Circle(SKETCH_9_R_2)
    cut_extrude_6_tool2 = extrude(cut_extrude_6_sk2.sketch, amount=-CUT_EXTRUDE_6_REACH, mode=Mode.PRIVATE) & part.part
    # 草图9 → 切除-拉伸6 (cut, up to next)
    with BuildSketch(Plane.XY.offset(13.5), mode=Mode.PRIVATE) as cut_extrude_6_sk3:
        with Locations((-22.5, 23)):
            Circle(SKETCH_9_R_2)
    cut_extrude_6_tool3 = extrude(cut_extrude_6_sk3.sketch, amount=-CUT_EXTRUDE_6_REACH, mode=Mode.PRIVATE) & part.part
    add(cut_extrude_6_tool1.solids().sort_by_distance((-37.5, 47.5, 13.5))[0], mode=Mode.SUBTRACT)
    add(cut_extrude_6_tool2.solids().sort_by_distance((-52.5, 23, 13.5))[0], mode=Mode.SUBTRACT)
    add(cut_extrude_6_tool3.solids().sort_by_distance((-22.5, 23, 13.5))[0], mode=Mode.SUBTRACT)

    # 圆角2
    # the kernel refuses this fillet: 5 mm, written as the material it adds along each edge
    with BuildSketch(Plane(origin=(-15.5, 20, 13.5), x_dir=(1, 0, 0), z_dir=(0, 0, -1))) as fillet_2_piece_1:
        with BuildLine():
            CenterArc((FILLET_2_R, -FILLET_2_R), FILLET_2_R, 90, 90)
            Line((0, -FILLET_2_R), (0, 0))
            Line((0, 0), (FILLET_2_R, 0))
        make_face()
    extrude(amount=5)
    with BuildSketch(Plane(origin=(-15.5, 20, 8.5), x_dir=(0, 0, -1), z_dir=(-1, 0, 0))) as fillet_2_piece_2_section:
        with BuildLine():
            CenterArc((FILLET_2_R, -FILLET_2_R), FILLET_2_R, 90, 90)
            Line((0, -FILLET_2_R), (0, 0))
            Line((0, 0), (FILLET_2_R, 0))
        make_face()
    fillet_2_piece_2 = extrude(amount=47, mode=Mode.PRIVATE)
    fillet_2_piece_2 = fillet_2_piece_2 - Plane(origin=(-22.5, 23, 7.347121569), x_dir=(1, 0, 0), z_dir=(0, 0, 1)) * Cylinder(1.4, 114, mode=Mode.PRIVATE)
    fillet_2_piece_2 = fillet_2_piece_2 - Plane(origin=(-52.5, 23, 7.347121569), x_dir=(1, 0, 0), z_dir=(0, 0, 1)) * Cylinder(1.4, 114, mode=Mode.PRIVATE)
    add(fillet_2_piece_2)
    with BuildSketch(Plane(origin=(-3, 20, 8.5), x_dir=(0, 0, -1), z_dir=(-1, 0, 0))) as fillet_2_piece_3a_section:
        with BuildLine():
            CenterArc((FILLET_2_R, -FILLET_2_R), FILLET_2_R, 90, 90)
            Line((0, -FILLET_2_R), (0, 0))
            Line((0, 0), (FILLET_2_R, 0))
        make_face()
    fillet_2_piece_3a = extrude(amount=59.5, mode=Mode.PRIVATE)
    fillet_2_piece_3a = split(fillet_2_piece_3a, bisect_by=Plane(origin=(-15.5, 21.131975571, 7.368024429), z_dir=(1, 0, 0)), keep=Keep.TOP, mode=Mode.PRIVATE)
    with BuildSketch(Plane(origin=(-15.5, 20, 13.5), x_dir=(1, 0, 0), z_dir=(0, 0, -1))) as fillet_2_piece_3b_section:
        with BuildLine():
            CenterArc((FILLET_2_R, -FILLET_2_R), FILLET_2_R, 90, 90)
            Line((0, -FILLET_2_R), (0, 0))
            Line((0, 0), (FILLET_2_R, 0))
        make_face()
    fillet_2_piece_3b = extrude(amount=17.5, mode=Mode.PRIVATE)
    fillet_2_piece_3b = split(fillet_2_piece_3b, bisect_by=Plane(origin=(-14.368024429, 21.131975571, 8.5), z_dir=(0, 0, -1)), keep=Keep.TOP, mode=Mode.PRIVATE)
    fillet_2_piece_3 = fillet_2_piece_3a & fillet_2_piece_3b
    add(fillet_2_piece_3)
    # the kernel refuses this fillet: 5 mm, written as the material it takes off along each edge
    with BuildSketch(Plane(origin=(-29.055327123, 28, 6.051586161), x_dir=(-0.9256891824228564, -0.378284995136344, 0), z_dir=(0, 0, 1))) as fillet_2_2_piece_1:
        with BuildLine():
            CenterArc((0.984836894, 4.998925199), FILLET_2_R, 247.772508302, 21.039469781)
            Line((-0.906588082, 0.370479287), (0, 0))
            ThreePointArc((0, 0), (0.440584926, 0.004567905), (0.881169852, 0))
        make_face()
    extrude(amount=9.896827677, mode=Mode.SUBTRACT)
    with BuildSketch(Plane(origin=(-45.944672877, 28, 6.051586161), x_dir=(-1, 0, 0), z_dir=(0, 0, 1))) as fillet_2_2_piece_2:
        with BuildLine():
            CenterArc((0.979365535, 5), FILLET_2_R, 248.960530219, 21.039469781)
            ThreePointArc((-0.8156894, 0.333333333), (-0.40611673, 0.170895126), (0, 0))
            Line((0, 0), (0.979365535, 0))
        make_face()
    extrude(amount=9.896827677, mode=Mode.SUBTRACT)


solid = part.part
